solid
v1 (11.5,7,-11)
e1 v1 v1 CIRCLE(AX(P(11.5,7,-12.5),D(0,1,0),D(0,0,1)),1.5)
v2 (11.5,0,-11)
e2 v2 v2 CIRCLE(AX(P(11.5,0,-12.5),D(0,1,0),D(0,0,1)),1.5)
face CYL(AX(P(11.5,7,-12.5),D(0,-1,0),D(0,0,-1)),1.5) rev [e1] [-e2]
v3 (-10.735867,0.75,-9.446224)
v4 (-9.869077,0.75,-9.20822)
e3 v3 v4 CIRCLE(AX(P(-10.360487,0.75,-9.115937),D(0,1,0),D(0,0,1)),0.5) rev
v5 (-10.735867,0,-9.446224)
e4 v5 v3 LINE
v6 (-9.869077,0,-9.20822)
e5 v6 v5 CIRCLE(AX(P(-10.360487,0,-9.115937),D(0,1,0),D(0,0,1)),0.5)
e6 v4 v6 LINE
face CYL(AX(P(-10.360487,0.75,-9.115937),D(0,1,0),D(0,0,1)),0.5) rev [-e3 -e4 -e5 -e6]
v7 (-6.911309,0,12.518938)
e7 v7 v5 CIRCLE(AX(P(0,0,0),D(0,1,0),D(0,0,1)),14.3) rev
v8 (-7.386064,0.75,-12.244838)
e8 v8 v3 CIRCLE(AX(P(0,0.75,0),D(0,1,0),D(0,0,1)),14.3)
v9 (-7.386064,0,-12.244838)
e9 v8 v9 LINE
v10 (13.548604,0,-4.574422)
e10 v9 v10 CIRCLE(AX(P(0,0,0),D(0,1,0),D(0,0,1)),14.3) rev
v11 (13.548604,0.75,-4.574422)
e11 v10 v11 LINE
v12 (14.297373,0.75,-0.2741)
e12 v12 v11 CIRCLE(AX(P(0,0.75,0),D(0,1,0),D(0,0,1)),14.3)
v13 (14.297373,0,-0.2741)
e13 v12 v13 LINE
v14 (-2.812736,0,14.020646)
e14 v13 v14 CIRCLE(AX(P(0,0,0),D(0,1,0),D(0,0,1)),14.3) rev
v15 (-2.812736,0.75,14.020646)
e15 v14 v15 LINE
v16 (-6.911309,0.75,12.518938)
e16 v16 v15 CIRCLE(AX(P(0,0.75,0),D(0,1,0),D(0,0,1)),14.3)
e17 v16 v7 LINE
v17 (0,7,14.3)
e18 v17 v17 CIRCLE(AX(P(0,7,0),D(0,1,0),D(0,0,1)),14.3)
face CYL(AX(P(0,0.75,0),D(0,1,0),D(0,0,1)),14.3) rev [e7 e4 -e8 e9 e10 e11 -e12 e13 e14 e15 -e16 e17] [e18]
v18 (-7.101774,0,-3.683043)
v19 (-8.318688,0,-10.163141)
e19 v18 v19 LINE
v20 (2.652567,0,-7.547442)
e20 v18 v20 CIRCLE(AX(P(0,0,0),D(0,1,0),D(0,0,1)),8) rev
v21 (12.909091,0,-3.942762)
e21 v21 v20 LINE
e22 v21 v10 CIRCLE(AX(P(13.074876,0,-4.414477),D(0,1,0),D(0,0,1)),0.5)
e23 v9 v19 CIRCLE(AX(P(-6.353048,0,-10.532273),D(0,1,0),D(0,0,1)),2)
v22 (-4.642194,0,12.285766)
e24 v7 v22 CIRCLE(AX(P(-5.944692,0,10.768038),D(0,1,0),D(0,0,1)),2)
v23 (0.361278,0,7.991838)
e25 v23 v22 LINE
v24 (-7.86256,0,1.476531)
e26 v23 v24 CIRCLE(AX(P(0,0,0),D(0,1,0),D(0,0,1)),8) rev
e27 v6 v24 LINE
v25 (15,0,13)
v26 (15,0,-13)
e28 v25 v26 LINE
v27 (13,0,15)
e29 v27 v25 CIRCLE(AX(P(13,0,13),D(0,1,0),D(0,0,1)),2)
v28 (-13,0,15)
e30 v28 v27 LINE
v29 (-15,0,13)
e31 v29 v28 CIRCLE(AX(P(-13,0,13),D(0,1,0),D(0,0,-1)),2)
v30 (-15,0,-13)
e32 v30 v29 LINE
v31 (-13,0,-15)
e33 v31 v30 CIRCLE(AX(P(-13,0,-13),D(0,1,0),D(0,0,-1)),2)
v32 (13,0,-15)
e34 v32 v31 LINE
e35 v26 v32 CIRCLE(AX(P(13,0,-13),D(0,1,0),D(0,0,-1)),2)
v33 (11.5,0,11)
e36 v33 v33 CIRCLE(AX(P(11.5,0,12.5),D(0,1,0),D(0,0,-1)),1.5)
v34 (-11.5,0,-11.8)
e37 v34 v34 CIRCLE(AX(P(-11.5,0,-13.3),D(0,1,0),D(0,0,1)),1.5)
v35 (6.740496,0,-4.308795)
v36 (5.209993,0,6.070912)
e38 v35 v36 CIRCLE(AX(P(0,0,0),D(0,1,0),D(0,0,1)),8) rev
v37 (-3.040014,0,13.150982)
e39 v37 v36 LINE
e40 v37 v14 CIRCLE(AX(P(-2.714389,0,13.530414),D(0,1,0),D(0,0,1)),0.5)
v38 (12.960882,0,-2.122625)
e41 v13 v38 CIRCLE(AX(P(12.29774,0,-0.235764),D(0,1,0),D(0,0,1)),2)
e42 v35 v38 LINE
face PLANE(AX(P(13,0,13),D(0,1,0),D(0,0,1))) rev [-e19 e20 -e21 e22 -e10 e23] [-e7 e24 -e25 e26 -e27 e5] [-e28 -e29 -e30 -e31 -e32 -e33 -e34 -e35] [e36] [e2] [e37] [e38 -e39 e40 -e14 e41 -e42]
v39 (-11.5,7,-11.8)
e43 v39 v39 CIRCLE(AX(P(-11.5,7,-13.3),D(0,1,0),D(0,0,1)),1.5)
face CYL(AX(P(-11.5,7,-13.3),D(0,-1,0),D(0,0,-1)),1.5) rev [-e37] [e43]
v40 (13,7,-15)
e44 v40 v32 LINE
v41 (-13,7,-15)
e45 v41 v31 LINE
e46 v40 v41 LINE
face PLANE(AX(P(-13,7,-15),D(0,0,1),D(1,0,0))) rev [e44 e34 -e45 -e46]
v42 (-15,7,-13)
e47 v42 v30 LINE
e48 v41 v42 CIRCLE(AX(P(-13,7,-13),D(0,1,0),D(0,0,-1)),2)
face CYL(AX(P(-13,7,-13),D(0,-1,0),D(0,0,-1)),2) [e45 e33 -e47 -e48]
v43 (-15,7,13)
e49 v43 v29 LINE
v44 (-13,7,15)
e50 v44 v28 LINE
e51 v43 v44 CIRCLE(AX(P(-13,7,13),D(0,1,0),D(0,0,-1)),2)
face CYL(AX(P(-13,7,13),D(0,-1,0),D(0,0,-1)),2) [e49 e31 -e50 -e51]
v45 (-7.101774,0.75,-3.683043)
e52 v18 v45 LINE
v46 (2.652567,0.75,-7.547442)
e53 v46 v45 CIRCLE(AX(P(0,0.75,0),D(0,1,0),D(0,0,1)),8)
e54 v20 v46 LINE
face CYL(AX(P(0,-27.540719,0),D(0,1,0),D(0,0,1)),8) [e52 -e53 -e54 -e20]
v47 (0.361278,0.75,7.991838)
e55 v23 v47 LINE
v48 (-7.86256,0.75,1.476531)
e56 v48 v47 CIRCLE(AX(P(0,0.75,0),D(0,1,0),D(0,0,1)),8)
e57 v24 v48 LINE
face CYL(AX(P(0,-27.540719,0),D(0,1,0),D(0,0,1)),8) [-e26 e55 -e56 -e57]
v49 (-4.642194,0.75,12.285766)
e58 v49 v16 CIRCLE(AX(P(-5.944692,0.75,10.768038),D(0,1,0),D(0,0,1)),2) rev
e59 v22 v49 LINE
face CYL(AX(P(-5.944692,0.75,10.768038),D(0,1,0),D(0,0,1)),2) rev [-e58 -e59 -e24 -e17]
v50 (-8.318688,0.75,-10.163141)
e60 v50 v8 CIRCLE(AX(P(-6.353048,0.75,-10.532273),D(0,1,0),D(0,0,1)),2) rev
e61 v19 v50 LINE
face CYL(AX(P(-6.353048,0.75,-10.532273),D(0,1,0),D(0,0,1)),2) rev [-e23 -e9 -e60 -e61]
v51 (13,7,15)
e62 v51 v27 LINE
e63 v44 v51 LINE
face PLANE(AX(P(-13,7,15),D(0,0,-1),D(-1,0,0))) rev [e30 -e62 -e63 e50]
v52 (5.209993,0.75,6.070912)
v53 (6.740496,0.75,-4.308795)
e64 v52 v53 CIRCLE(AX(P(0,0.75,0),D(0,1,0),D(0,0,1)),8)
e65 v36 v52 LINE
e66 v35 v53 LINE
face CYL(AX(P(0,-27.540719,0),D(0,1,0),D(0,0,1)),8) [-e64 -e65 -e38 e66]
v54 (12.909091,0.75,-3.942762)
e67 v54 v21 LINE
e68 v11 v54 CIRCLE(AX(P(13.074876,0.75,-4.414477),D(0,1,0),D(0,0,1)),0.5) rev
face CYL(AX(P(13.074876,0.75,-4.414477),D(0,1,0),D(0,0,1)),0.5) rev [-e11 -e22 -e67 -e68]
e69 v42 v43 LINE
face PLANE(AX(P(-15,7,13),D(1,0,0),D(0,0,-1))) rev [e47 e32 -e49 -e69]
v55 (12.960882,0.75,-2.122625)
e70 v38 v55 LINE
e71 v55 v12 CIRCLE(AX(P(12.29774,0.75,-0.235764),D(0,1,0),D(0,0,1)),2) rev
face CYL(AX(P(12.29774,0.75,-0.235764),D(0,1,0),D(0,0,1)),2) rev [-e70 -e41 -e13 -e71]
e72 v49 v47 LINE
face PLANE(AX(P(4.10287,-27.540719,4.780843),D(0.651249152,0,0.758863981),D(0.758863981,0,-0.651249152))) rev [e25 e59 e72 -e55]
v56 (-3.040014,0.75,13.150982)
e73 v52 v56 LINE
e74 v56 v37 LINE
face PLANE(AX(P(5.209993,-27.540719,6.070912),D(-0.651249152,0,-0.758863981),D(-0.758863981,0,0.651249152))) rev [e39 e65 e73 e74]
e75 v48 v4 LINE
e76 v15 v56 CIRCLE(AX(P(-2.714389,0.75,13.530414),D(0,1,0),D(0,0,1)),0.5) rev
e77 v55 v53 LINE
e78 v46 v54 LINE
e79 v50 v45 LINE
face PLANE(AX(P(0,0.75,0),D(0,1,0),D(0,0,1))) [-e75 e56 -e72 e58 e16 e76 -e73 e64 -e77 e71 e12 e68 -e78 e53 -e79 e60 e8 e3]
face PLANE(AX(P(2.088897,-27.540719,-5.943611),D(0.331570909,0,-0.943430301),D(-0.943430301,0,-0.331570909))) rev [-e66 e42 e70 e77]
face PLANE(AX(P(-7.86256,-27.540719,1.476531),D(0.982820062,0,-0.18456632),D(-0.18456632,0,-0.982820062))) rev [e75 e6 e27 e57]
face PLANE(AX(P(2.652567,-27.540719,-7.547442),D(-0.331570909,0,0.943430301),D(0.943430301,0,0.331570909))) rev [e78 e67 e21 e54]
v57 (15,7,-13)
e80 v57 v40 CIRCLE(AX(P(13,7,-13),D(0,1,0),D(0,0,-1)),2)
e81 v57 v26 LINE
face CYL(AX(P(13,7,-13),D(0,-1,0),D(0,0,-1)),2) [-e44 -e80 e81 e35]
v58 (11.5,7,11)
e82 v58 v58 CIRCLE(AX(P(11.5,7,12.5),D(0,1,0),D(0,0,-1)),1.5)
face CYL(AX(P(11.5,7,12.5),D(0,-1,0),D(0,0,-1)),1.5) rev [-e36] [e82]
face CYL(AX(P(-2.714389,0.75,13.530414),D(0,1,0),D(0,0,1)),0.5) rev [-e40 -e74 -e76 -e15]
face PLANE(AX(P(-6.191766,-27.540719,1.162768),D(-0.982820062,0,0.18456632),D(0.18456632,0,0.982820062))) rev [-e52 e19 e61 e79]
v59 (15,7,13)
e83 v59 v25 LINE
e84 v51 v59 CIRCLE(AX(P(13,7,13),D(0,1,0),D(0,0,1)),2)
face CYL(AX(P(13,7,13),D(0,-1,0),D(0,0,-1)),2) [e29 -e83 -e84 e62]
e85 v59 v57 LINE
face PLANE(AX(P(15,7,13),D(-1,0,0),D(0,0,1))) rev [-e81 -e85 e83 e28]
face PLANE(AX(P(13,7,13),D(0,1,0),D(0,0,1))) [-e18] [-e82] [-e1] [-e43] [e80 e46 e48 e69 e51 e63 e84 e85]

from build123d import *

# Parameters (mm, degrees)
SKETCH1_R        = 1.5
MAINBLOCK_DEPTH  = 7
SKETCH2_R        = 14.3
ROTORSPACE_DEPTH = 6.25
MOTORBASE_DEPTH  = 0.75
FILLET1_R        = 2
FILLET2_R        = 0.5


with BuildPart() as part:
    # Sketch1 → MainBlock (new body)
    with BuildSketch(Plane(origin=(0, 0, 0), x_dir=(1, 0, 0), z_dir=(0, 1, 0))):
        with BuildLine():
            Line((-13, -15), (13, -15))
            ThreePointArc((13, -15), (14.414213562, -14.414213562), (15, -13))
            Line((15, -13), (15, 13))
            ThreePointArc((15, 13), (14.414213562, 14.414213562), (13, 15))
            Line((13, 15), (-13, 15))
            ThreePointArc((-13, 15), (-14.414213562, 14.414213562), (-15, 13))
            Line((-15, 13), (-15, -13))
            ThreePointArc((-15, -13), (-14.414213562, -14.414213562), (-13, -15))
        make_face()
        with Locations(Location((-11.5, 13.3, 0), (0, 0, 270))):
            Circle(SKETCH1_R, mode=Mode.SUBTRACT)
        with Locations(Location((11.5, 12.5, 0), (0, 0, 270))):
            Circle(SKETCH1_R, mode=Mode.SUBTRACT)
        with Locations(Location((11.5, -12.5, 0), (0, 0, 90))):
            Circle(SKETCH1_R, mode=Mode.SUBTRACT)
    extrude(amount=MAINBLOCK_DEPTH)

    # Sketch2 → RotorSpace (cut)
    with BuildSketch(Plane(origin=(0, 7, 0), x_dir=(1, 0, 0), z_dir=(0, 1, 0))):
        with Locations(Location((0, 0, 0), (0, 0, 270))):
            Circle(SKETCH2_R)
    extrude(amount=-ROTORSPACE_DEPTH, mode=Mode.SUBTRACT)

    # Sketch3 → MotorBase (cut)
    with BuildSketch(Plane(origin=(0, 0.75, 0), x_dir=(1, 0, 0), z_dir=(0, 1, 0))):
        with BuildLine():
            ThreePointArc((0.361277738, -7.991838236), (-4.967858622, -6.27059652), (-7.862560494, -1.476530557))
            Line((-7.862560494, -1.476530557), (-10.050196981, 10.172686009))
            ThreePointArc((-10.050196981, 10.172686009), (-14.050704626, -2.658514534), (-5.639005132, -13.141218403))
            Line((-5.639005132, -13.141218403), (0.361277738, -7.991838236))
        make_face()
        with BuildLine():
            ThreePointArc((-7.101773805, 3.683043419), (-2.946566572, 7.437590029), (2.652567275, 7.547442405))
            Line((2.652567275, 7.547442405), (13.834902999, 3.617382894))
            ThreePointArc((13.834902999, 3.617382894), (4.72301119, 13.497524414), (-8.561126408, 11.454130898))
            Line((-8.561126408, 11.454130898), (-7.101773805, 3.683043419))
        make_face()
        with BuildLine():
            Line((14.20013154, 1.687087505), (6.740496067, 4.308794817))
            ThreePointArc((6.740496067, 4.308794817), (7.678670736, 2.244552457), (8, 0))
            ThreePointArc((8, 0), (7.269110872, -3.340662678), (5.209993218, -6.070911848))
            Line((5.209993218, -6.070911848), (-3.784706018, -13.790068903))
            ThreePointArc((-3.784706018, -13.790068903), (8.670891071, -11.371264135), (14.3, 0))
            ThreePointArc((14.3, 0), (14.275011051, 0.845020408), (14.20013154, 1.687087505))
        make_face()
    extrude(amount=-MOTORBASE_DEPTH, mode=Mode.SUBTRACT)

    # Fillet1
    # the kernel refuses this fillet: 2 mm, written as the material it adds along each edge
    with BuildSketch(Plane(origin=(-8.561126408, 0.75, -11.454130898), x_dir=(0.18456631960106568, 0, 0.982820061694366), z_dir=(0, -1, 0)), Plane(origin=(14.20013154, 0.75, -1.687087505), x_dir=(-0.9434303005767882, 0, -0.33157090938981826), z_dir=(0, -1, 0))) as fillet1_piece_1:
        with BuildLine():
            CenterArc((1.313556996, -2), FILLET1_R, 90, 69.537546468)
            ThreePointArc((-0.560245969, -1.300813008), (-0.296237592, -0.643466118), (0, 0))
            Line((0, 0), (1.313556996, 0))
        make_face()
    extrude(amount=0.75)
    with BuildSketch(Plane(origin=(-5.639005132, 0.75, 13.141218403), x_dir=(-0.8983104632101903, 0, -0.43936125419419186), z_dir=(0, -1, 0))) as fillet1_piece_2:
        with BuildLine():
            CenterArc((1.317285733, 1.997546064), FILLET1_R, 203.301017311, 69.537546468)
            Line((-0.519592983, 1.206422444), (0, 0))
            ThreePointArc((0, 0), (0.708164887, -0.017545642), (1.416329774, 0))
        make_face()
    extrude(amount=0.75)

    # Fillet2
    # the kernel refuses this fillet: 0.5 mm, written as the material it adds along each edge
    with BuildSketch(Plane(origin=(13.834902999, 0.75, -3.617382894), x_dir=(-0.9434303005767886, 0, -0.33157090938981726), z_dir=(0, -1, 0)), Plane(origin=(-3.784706018, 0.75, 13.790068903), x_dir=(0.7588639809758072, 0, -0.6512491523046687), z_dir=(0, -1, 0)), Plane(origin=(-10.050196981, 0.75, -10.172686009), x_dir=(0.18456631960117675, 0, 0.982820061694345), z_dir=(0, -1, 0))) as fillet2_piece_1:
        with BuildLine():
            CenterArc((0.981325327, 0.5), FILLET2_R, 141.979598277, 128.020401723)
            ThreePointArc((0.587429586, 0.807971014), (0.286657409, 0.409116528), (0, 0))
            Line((0, 0), (0.981325327, 0))
        make_face()
    extrude(amount=0.75)


solid = part.part
